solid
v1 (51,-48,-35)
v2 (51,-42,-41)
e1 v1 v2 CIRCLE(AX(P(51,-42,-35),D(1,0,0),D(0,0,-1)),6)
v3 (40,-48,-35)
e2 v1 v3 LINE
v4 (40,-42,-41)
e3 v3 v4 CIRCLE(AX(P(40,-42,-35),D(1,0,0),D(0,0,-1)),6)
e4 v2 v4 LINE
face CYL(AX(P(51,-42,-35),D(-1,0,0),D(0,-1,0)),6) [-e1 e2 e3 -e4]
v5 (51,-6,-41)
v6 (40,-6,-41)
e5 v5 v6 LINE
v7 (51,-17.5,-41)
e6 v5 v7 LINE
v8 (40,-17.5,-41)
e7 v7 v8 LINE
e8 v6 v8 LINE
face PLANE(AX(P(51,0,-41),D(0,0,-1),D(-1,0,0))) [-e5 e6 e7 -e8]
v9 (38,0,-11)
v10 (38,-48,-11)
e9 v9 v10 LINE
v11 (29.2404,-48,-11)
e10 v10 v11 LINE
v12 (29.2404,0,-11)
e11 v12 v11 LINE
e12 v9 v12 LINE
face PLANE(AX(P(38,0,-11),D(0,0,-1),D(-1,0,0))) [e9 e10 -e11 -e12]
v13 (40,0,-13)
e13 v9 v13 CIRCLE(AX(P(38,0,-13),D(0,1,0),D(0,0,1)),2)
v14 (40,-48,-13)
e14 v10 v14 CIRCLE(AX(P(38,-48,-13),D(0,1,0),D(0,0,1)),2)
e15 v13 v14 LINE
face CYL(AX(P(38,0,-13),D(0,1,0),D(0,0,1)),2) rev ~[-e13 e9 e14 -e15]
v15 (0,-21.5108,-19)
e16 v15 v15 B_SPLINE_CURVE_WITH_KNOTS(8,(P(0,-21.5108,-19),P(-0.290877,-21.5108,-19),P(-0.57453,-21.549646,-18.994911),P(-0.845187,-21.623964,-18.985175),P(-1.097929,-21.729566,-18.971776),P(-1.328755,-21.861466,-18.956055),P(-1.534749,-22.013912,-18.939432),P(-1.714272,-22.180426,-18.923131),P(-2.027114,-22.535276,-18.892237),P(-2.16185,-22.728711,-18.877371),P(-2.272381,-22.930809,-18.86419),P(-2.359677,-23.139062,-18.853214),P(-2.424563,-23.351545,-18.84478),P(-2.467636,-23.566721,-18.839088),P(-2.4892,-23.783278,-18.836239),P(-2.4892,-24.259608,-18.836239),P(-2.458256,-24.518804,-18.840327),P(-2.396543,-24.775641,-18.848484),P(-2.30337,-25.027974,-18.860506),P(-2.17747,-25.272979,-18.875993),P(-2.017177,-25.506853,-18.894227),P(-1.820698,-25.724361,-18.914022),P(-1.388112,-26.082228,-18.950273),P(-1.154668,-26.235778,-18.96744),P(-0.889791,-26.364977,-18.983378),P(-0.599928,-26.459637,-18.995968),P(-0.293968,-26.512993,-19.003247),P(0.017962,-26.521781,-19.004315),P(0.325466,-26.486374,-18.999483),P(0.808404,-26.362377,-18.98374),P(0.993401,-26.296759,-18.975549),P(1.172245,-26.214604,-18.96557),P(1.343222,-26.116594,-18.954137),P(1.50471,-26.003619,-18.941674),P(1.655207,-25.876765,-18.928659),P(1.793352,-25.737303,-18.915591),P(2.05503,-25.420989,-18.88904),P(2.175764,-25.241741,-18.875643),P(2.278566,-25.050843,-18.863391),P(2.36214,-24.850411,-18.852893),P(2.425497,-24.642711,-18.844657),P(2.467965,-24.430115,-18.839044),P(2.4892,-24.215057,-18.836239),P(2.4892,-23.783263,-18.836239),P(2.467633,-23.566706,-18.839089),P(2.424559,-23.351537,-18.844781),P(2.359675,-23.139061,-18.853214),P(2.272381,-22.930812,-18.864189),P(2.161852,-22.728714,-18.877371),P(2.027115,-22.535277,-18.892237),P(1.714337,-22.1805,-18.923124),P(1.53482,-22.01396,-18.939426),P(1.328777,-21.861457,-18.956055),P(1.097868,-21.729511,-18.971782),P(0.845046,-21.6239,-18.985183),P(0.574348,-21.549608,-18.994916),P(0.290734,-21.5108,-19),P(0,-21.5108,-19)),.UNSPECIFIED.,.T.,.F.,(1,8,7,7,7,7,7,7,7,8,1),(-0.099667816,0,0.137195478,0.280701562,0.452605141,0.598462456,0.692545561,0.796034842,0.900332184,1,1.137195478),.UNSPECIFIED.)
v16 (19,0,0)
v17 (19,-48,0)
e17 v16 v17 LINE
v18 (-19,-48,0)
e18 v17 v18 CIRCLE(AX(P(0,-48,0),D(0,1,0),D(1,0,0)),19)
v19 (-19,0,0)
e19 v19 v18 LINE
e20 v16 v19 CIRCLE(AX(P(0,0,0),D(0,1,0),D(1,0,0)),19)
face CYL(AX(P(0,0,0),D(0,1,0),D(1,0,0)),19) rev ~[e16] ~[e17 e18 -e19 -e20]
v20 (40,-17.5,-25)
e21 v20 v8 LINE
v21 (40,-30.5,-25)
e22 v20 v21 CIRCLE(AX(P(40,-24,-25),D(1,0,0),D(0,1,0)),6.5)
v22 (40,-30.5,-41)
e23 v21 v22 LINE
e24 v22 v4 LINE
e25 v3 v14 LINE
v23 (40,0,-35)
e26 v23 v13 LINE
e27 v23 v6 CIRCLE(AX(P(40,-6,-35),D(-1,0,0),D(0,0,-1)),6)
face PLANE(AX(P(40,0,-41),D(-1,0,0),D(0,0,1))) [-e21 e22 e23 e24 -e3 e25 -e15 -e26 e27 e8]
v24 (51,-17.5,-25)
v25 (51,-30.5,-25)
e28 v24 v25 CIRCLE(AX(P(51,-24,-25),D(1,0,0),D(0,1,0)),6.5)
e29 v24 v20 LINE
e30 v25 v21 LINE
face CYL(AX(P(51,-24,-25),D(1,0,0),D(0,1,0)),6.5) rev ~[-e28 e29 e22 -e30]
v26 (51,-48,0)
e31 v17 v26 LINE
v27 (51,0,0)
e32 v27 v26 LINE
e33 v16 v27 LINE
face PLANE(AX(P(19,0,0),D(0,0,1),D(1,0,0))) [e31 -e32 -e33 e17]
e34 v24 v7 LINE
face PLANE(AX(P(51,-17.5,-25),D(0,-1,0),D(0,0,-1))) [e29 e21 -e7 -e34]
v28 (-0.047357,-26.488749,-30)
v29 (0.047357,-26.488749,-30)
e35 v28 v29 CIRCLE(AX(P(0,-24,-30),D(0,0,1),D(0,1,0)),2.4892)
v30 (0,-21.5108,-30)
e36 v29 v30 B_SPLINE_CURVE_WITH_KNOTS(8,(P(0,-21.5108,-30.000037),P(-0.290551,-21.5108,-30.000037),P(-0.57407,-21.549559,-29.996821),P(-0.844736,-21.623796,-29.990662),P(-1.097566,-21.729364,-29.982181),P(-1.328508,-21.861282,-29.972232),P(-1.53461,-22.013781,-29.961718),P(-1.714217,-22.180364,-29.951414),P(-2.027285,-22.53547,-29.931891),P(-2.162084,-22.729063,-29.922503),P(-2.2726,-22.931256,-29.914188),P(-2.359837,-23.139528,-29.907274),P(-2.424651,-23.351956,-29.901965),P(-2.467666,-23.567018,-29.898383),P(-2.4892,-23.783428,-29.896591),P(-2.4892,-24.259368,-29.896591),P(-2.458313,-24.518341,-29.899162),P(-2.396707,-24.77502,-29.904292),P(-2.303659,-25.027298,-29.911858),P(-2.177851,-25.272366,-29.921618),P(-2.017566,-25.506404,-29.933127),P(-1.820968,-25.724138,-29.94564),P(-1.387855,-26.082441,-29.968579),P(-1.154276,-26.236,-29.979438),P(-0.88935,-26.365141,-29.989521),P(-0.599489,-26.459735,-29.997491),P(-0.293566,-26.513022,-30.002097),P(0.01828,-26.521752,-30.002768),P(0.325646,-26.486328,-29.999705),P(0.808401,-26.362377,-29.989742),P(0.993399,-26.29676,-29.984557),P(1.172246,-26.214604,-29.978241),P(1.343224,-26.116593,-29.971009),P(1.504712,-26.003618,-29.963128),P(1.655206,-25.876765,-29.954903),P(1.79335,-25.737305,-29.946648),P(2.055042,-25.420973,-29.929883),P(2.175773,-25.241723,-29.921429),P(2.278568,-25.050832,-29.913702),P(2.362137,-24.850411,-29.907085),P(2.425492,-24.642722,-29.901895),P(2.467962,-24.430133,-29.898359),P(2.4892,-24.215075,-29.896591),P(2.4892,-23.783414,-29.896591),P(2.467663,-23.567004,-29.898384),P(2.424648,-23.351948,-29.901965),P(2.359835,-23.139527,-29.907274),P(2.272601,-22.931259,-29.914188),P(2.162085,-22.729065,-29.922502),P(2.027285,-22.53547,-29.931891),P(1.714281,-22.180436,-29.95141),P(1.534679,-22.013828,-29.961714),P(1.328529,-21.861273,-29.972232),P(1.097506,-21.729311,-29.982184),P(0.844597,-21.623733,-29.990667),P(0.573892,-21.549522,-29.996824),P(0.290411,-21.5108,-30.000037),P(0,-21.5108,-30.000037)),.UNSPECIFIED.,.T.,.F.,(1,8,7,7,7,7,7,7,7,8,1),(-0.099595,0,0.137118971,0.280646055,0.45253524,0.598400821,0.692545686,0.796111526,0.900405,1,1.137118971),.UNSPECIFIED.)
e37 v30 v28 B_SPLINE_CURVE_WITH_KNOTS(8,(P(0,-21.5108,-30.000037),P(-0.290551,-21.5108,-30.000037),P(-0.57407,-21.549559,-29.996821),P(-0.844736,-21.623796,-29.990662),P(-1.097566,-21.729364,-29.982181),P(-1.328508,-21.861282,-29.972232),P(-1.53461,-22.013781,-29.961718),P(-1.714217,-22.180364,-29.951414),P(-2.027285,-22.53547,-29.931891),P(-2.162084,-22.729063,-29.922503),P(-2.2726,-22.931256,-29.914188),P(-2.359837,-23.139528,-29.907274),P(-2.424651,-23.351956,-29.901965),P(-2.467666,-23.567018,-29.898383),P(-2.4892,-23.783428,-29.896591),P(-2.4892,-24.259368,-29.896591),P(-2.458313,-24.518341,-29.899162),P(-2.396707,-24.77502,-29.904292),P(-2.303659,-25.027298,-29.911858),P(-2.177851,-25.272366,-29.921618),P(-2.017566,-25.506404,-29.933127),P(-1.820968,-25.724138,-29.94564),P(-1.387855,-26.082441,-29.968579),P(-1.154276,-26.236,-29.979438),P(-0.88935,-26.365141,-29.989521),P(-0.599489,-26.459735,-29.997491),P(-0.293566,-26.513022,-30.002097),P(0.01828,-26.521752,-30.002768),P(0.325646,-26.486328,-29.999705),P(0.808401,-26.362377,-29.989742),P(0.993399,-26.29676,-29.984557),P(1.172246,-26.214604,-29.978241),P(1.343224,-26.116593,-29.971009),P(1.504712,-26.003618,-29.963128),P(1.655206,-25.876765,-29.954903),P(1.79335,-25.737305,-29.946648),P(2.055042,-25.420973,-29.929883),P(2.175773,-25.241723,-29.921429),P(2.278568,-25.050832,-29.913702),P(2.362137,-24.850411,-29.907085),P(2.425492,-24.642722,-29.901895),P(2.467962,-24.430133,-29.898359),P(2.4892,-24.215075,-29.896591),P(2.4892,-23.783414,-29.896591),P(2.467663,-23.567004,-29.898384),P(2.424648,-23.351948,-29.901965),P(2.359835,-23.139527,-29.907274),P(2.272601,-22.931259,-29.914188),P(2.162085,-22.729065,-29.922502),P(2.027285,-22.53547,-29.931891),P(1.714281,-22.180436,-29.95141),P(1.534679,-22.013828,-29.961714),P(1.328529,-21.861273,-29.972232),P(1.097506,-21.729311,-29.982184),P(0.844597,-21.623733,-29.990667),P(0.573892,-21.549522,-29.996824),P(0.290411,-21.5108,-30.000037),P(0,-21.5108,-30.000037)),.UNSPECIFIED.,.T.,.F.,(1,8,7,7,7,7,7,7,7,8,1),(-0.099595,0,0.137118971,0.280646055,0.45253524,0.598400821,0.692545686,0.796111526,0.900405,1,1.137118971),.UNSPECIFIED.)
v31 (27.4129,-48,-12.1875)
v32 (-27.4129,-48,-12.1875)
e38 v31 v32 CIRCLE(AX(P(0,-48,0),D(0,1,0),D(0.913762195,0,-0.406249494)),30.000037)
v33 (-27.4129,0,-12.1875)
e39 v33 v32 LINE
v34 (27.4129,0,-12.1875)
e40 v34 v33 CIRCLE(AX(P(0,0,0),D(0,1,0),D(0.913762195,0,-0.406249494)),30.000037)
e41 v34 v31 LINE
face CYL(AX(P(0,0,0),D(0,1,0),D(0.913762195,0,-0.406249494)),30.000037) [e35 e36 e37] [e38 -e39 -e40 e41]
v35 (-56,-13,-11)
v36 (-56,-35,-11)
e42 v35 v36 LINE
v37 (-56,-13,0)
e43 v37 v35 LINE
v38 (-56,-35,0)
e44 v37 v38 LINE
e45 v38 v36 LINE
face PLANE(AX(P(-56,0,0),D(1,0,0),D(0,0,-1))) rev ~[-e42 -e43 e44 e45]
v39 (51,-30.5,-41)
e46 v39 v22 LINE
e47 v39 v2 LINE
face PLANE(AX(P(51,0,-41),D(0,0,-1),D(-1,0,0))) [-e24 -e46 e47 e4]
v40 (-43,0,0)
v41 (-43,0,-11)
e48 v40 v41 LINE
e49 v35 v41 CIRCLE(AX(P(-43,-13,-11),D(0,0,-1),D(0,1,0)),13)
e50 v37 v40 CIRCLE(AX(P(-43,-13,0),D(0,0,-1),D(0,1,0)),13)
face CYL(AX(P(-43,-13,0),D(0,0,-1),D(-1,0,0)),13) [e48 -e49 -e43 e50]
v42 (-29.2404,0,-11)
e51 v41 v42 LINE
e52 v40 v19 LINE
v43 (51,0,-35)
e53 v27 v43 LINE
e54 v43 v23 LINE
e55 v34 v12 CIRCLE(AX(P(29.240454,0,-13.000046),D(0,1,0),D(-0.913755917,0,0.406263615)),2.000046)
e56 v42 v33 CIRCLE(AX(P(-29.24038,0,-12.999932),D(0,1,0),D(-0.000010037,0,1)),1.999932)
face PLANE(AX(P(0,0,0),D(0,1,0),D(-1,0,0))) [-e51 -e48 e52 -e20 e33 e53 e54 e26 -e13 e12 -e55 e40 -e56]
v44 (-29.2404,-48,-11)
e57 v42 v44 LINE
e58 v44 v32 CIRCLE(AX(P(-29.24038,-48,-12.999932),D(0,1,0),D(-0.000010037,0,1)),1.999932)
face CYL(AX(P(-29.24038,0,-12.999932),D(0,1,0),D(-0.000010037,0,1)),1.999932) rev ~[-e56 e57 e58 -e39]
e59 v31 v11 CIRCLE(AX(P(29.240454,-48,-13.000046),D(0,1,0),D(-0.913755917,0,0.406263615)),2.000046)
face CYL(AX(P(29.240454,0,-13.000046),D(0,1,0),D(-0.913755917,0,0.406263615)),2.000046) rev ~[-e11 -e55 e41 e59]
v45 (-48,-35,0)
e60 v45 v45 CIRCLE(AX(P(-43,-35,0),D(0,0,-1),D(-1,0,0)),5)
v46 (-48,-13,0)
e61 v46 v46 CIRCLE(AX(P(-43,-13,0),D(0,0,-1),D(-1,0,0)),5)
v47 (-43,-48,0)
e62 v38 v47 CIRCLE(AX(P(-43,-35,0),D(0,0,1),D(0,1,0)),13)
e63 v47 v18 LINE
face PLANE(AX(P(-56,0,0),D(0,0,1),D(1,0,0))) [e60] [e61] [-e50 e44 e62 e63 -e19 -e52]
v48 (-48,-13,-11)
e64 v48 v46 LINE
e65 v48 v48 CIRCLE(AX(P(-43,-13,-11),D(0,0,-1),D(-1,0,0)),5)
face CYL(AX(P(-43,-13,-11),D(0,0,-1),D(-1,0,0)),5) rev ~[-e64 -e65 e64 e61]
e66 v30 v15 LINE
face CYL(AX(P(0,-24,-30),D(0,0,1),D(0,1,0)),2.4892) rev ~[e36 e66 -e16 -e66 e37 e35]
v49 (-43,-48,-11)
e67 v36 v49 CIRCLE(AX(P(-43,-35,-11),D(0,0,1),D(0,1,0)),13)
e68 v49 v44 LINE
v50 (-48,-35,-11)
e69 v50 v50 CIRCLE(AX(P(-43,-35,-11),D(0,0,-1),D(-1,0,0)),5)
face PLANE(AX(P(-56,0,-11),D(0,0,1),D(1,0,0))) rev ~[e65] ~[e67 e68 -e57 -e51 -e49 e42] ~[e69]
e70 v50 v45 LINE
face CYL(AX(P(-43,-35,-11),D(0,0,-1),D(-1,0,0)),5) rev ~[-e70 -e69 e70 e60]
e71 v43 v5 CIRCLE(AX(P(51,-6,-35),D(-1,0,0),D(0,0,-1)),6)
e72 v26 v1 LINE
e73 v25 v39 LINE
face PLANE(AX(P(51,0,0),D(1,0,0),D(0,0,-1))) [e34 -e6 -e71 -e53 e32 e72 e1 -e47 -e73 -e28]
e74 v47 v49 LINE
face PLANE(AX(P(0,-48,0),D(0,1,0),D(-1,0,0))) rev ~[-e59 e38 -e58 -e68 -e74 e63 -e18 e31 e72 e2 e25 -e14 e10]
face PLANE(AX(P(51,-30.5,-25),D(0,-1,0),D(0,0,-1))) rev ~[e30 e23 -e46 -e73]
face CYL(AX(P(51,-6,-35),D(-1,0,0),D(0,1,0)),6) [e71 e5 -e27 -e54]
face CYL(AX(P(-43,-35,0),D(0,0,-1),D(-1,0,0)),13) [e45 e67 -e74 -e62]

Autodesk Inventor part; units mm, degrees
ref_plane "YZ Plane" through (0, 0, 0) normal (1, 0, 0) x (0, 1, 0)
ref_plane "XZ Plane" through (0, 0, 0) normal (0, 1, 0) x (-1, 0, 0)
sketch "Náčrt1" plane through (0, 0, 0) normal (0, 1, 0) x (-1, 0, 0)
  arc A0 (-19, 0) -> (19, 0) centre (0, 0) ccw
  arc A1 (-27.4129, -12.1875) -> (27.4129, -12.1875) centre (0, 0) ccw
  line L0 (56, 0) -> (56, -11)
  line L1 (56, -11) -> (29.2404, -11)
  line L2 (-51, 0) -> (-51, -41)
  line L3 (-51, -41) -> (-40, -41)
  line L4 (-40, -41) -> (-40, -13)
  line L5 (-38, -11) -> (-29.2404, -11)
  arc A2 (29.2404, -11) -> (27.4129, -12.1875) centre (29.2404, -13) ccw
  arc A3 (-27.4129, -12.1875) -> (-29.2404, -11) centre (-29.2404, -13) ccw
  arc A4 (-38, -11) -> (-40, -13) centre (-38, -13) ccw
  line L6 (56, 0) -> (19, 0)
  line L7 (-19, 0) -> (-51, 0)
  point P0 (27.9106, -11)
  point P1 (-27.9106, -11)
  dimension "d0" = 19
  dimension "d1" = 30
  dimension "d3" = 107
  dimension "d4" = 51
  dimension "d5" = 11
  dimension "d6" = 41
  dimension "d7" = 11
  dimension "d8" = 2
  dimension "d9" = 2
  dimension "d10" = 2
  dimension "d16" = 96
  dimension "d17" = 56
extrude "Vysunutí1" add sketch "Náčrt1" against normal blind 48
fillet "Zaoblení1" radius 13 1 edges at (-56, 0, -5.5)
fillet "Zaoblení2" radius 13 1 edges at (-56, -48, -5.5)
fillet "Zaoblení3" radius 6 2 edges at (45.5, -48, -41) (45.5, 0, -41)
sketch "Náčrt2" plane through (-29.2404, -48, -11) normal (0, 0, -1) x (-1, 0, 0)
  line L0 (-56.6532, 0) -> (-1.8275, 0) projected
  circle A0 centre (13.7596, 13) radius 5
  circle A1 centre (13.7596, 35) radius 5
  point P0 (-29.2404, 48)
  dimension "d26" = 10
  dimension "d27" = 10
  dimension "d28" = 35
  dimension "d29" = 13
  dimension "d30" = 38.3139
  dimension "d31" = 20.2968
extrude "Vysunutí2" cut sketch "Náčrt2" against normal blind 11
ref_plane "Pracovní rovina1" through (0, 0, -30) normal (0, 0, -1) x (-1, 0, 0)
sketch "Náčrt3" plane through (0, 0, -30) normal (0, 0, -1) x (-1, 0, 0)
  circle A0 centre (0, -24) radius 2.5
  point P0 (0, 0)
  dimension "d34" = 5
hole "Díra1" at (0, -24, -30) direction (0, 0, 1) diameter 4.9784 end through all thread size "1/4-20 UNC" class "2B" standard "ANSI Unified Screw Threads"
sketch "Náčrt4" plane through (51, -48, 0) normal (1, 0, 0) x (0, 0, -1)
  line L0 (0, 48) -> (0, 0) projected
  line L1 (0, 48) -> (35, 48) projected
  arc A0 (25, 30.5) -> (25, 17.5) centre (25, 24) ccw
  line L2 (25, 30.5) -> (41, 30.5)
  line L3 (25, 17.5) -> (41, 17.5)
  line L4 (41, 17.5) -> (41, 30.5)
  dimension "d45" = 13
  dimension "d46" = 24
  dimension "d47" = 25
  dimension "d48" = 41
extrude "Vysunutí3" cut sketch "Náčrt4" against normal blind 11
properties part number "3"
